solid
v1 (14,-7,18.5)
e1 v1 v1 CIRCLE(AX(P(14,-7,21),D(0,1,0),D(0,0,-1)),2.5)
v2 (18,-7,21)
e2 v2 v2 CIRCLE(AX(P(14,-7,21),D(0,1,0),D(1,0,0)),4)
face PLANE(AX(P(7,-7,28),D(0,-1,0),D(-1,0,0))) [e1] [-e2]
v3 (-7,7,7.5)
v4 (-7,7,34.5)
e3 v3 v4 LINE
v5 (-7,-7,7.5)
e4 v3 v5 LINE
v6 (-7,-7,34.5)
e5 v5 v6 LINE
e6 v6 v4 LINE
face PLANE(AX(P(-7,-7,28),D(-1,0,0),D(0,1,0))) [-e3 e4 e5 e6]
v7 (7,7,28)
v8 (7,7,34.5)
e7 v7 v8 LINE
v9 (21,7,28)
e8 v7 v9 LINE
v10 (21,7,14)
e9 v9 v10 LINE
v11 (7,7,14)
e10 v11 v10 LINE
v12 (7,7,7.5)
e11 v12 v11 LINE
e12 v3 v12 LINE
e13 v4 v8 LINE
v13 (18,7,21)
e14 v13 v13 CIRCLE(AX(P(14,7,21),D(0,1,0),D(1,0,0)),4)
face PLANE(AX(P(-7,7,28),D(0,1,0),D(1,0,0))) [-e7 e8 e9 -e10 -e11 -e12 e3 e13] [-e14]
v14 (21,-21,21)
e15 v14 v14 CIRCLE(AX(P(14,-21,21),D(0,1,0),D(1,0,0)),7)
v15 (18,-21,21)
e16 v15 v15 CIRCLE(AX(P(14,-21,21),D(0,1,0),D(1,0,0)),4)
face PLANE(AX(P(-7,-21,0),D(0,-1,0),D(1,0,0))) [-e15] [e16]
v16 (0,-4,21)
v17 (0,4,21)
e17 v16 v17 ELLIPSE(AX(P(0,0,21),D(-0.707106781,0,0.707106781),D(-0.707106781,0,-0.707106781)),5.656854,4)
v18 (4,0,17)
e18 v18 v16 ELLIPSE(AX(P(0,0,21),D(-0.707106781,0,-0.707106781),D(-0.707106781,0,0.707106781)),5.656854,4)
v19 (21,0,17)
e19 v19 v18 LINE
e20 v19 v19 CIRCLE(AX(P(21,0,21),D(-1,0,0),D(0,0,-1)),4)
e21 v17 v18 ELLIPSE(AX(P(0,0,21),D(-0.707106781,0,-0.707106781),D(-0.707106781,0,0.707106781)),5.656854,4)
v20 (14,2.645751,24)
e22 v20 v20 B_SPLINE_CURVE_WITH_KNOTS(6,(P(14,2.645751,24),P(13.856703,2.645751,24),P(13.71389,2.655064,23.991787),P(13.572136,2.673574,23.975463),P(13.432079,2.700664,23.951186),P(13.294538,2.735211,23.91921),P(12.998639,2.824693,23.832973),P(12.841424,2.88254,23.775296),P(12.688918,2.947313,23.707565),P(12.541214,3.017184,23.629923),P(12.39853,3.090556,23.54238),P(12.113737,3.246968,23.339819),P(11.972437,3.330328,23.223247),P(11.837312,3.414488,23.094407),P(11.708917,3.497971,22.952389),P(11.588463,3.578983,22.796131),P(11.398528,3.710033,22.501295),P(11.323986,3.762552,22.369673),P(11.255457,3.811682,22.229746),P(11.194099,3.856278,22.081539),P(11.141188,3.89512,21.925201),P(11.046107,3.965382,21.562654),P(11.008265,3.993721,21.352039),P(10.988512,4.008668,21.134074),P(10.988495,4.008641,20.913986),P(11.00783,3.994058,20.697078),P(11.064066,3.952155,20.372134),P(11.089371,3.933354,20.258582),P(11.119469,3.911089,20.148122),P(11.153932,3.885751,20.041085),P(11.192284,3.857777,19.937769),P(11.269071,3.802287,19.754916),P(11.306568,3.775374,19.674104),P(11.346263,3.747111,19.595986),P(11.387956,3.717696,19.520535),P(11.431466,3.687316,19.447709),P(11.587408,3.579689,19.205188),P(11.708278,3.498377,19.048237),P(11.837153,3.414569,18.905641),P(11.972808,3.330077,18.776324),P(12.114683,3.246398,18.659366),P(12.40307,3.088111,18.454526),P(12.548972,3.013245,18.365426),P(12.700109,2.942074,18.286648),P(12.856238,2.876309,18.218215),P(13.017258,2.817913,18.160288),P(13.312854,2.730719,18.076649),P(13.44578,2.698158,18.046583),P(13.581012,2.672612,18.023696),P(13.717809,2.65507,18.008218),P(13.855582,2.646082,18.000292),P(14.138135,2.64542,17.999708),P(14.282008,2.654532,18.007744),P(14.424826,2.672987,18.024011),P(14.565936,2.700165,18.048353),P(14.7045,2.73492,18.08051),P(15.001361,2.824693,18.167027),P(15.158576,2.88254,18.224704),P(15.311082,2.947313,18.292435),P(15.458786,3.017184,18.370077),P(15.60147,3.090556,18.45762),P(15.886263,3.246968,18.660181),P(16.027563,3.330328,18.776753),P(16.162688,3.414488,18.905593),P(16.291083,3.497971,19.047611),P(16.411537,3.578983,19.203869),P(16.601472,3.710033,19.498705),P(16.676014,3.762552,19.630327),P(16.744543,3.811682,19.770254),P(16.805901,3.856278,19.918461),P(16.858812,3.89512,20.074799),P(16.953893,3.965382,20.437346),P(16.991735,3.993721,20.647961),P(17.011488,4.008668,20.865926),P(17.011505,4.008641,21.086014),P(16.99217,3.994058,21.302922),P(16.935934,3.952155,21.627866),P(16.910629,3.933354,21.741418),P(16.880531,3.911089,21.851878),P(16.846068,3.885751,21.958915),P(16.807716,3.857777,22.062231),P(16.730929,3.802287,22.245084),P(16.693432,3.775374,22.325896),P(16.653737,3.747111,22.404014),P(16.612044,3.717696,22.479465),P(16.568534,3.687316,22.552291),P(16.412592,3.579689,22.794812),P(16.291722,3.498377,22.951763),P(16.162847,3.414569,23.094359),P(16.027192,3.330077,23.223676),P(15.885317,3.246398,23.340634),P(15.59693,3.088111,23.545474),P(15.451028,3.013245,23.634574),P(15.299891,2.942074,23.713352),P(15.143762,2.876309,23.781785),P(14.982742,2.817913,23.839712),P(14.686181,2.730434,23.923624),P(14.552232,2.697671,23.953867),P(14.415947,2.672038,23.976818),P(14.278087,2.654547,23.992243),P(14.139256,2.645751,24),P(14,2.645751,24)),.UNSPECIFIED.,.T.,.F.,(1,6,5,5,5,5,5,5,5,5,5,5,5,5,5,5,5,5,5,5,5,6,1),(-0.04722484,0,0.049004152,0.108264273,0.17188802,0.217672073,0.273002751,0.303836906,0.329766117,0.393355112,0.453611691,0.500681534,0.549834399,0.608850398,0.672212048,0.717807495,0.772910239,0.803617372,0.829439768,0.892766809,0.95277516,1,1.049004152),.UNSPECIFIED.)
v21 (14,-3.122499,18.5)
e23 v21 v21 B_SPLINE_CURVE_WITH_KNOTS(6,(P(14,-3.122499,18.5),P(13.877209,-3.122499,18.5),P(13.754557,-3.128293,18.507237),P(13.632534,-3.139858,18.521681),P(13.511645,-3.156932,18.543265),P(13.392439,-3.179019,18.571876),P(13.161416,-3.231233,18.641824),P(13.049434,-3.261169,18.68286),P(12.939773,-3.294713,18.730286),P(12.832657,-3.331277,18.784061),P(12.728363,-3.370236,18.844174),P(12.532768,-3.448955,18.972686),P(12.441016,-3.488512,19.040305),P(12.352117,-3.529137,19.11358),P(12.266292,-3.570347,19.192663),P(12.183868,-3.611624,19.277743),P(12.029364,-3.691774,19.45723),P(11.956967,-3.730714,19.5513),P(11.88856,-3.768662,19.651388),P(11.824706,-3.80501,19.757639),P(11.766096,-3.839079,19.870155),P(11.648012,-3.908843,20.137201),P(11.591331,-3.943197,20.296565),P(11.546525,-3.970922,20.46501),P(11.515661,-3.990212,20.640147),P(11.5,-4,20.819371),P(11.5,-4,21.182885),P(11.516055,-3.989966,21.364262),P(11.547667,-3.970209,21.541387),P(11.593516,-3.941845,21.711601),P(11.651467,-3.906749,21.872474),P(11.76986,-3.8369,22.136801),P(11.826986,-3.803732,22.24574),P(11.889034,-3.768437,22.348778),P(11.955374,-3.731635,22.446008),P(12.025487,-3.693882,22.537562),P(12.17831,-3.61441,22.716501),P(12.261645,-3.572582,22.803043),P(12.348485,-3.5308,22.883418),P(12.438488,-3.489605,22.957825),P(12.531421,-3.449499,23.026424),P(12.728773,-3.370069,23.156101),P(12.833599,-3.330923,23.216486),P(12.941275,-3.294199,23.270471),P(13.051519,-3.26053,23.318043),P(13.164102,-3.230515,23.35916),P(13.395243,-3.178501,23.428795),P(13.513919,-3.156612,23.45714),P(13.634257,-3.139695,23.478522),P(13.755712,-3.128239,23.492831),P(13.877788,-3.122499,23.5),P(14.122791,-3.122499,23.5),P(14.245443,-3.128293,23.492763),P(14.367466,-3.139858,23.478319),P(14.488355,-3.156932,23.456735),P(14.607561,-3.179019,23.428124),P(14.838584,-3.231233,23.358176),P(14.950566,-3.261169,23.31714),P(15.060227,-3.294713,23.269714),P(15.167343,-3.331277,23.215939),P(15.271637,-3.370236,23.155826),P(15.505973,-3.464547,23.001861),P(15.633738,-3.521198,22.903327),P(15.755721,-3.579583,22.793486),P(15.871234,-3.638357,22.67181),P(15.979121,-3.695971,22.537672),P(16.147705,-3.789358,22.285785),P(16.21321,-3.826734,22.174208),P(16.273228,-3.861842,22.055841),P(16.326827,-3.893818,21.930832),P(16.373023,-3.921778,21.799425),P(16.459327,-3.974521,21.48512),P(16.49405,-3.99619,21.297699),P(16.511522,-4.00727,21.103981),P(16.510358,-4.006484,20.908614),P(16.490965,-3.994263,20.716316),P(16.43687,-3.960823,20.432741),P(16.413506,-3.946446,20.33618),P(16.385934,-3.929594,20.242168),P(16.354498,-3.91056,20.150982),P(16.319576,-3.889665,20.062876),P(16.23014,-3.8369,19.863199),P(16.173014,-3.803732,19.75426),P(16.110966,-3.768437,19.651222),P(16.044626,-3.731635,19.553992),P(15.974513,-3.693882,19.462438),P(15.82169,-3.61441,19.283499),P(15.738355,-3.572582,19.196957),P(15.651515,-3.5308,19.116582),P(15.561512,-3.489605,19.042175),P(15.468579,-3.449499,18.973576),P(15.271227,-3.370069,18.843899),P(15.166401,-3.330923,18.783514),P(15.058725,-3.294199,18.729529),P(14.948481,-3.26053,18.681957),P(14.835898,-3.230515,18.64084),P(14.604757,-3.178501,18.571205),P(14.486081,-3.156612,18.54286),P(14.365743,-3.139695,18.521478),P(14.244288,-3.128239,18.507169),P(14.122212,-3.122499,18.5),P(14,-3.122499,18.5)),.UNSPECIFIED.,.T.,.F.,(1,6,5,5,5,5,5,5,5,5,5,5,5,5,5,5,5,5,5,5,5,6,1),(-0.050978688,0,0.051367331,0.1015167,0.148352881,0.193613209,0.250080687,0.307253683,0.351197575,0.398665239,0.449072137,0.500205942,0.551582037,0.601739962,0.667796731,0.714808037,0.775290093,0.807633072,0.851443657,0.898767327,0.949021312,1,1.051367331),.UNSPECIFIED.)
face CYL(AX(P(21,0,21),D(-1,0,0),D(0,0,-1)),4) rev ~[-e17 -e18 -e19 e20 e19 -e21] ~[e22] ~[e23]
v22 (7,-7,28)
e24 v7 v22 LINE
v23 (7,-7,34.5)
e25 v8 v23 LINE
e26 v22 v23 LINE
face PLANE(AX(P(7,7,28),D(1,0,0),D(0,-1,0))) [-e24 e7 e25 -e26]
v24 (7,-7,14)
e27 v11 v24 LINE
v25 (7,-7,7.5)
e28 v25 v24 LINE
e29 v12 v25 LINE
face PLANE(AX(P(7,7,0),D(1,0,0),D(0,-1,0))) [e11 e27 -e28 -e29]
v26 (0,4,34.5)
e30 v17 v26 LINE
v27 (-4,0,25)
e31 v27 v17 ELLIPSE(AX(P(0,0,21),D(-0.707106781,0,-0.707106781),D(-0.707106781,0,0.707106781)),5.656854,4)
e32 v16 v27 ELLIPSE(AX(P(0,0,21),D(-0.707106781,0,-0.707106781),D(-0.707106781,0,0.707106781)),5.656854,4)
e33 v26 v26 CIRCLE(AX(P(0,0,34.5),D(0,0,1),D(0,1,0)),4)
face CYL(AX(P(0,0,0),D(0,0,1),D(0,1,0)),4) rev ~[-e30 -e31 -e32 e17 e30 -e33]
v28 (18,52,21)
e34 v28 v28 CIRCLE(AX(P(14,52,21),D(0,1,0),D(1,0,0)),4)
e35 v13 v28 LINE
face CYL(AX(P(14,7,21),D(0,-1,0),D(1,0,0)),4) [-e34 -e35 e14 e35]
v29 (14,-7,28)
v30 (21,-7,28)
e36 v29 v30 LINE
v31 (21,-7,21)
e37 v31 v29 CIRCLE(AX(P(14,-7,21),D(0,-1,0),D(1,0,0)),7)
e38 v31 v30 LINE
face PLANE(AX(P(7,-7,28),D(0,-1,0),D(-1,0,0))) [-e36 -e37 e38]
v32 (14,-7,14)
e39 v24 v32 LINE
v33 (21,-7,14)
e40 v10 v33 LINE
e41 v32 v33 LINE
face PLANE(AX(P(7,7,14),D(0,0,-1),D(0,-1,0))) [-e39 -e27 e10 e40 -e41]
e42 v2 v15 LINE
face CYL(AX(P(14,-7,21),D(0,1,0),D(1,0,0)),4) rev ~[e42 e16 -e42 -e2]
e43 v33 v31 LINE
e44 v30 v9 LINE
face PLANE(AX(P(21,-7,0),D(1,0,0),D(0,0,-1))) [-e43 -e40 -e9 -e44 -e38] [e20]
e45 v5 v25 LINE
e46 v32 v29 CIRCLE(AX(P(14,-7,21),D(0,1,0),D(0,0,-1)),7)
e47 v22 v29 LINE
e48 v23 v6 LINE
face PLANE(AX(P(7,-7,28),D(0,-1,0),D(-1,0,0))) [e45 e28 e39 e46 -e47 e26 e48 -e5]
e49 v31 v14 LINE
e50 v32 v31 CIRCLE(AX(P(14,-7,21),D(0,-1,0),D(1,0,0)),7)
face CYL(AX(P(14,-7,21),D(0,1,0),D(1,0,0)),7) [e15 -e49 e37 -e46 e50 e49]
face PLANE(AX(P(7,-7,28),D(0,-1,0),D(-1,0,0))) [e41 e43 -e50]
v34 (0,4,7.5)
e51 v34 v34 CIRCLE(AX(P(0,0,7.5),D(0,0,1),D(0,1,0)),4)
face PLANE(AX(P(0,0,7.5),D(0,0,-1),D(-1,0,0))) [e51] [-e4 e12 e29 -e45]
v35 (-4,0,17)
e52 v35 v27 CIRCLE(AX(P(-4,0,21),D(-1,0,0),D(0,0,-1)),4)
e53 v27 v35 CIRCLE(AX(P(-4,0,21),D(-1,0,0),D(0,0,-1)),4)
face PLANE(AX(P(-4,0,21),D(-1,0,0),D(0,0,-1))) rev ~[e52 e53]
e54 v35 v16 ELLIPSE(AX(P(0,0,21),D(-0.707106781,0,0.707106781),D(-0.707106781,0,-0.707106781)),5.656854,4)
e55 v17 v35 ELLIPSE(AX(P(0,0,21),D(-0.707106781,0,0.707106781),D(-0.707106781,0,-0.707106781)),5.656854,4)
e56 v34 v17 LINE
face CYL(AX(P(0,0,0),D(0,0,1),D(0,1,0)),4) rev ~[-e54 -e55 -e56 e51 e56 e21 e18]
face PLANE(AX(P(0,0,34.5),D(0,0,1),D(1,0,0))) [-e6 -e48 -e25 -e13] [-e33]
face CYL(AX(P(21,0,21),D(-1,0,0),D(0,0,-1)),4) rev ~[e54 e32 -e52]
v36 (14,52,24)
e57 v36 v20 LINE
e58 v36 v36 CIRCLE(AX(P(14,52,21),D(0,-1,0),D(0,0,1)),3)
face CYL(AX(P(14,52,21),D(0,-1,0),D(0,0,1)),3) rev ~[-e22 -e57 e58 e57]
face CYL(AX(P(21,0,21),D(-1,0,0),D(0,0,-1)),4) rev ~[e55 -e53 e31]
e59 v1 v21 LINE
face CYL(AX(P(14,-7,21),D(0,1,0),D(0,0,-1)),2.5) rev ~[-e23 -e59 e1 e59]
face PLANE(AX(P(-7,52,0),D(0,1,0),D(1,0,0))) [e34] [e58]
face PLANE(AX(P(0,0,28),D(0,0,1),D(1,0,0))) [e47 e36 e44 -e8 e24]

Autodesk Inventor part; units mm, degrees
ref_plane "YZ Plane" through (0, 0, 0) normal (1, 0, 0) x (0, 1, 0)
ref_plane "XZ Plane" through (0, 0, 0) normal (0, 1, 0) x (-1, 0, 0)
ref_plane "XY Plane" through (0, 0, 0) normal (0, 0, 1) x (1, 0, 0)
sketch "Sketch1" plane through (0, 0, 0) normal (0, 0, 1) x (1, 0, 0)
  line L0 (-7, 7) -> (7, 7)
  line L1 (7, 7) -> (7, -7)
  line L2 (7, -7) -> (-7, -7)
  line L3 (-7, -7) -> (-7, 7)
  line L4 (-7, 7) -> (7, -7) construction
  line L5 (7, 7) -> (-7, -7) construction
  point P0 (0, 0)
  dimension "d0" = 14
  dimension "d1" = 14
extrude "Extrusion1" add sketch "Sketch1" along normal blind 28
sketch "Sketch2" plane through (7, -7, 0) normal (1, 0, 0) x (0, 0, -1)
  line L0 (-28, 0) -> (-28, 14) projected
  line L1 (-28, 14) -> (-14, 14)
  line L2 (-14, 14) -> (-14, 0)
  line L3 (-14, 0) -> (-28, 0)
  line L4 (-28, 0) -> (-28, 14)
  point P0 (0, 7)
  dimension "d4" = 14
  dimension "d5" = 14
extrude "Extrusion2" add sketch "Sketch2" along normal blind 14
sketch "Sketch3" plane through (21, -7, 0) normal (1, 0, 0) x (0, 0, -1)
  line L0 (-14, 0) -> (-14, 14) projected
  line L1 (-14, 14) -> (-28, 14) projected
  line L2 (-28, 14) -> (-28, 0) projected
  line L3 (-28, 0) -> (-14, 0) projected
  line L4 (-28, 14) -> (-14, 14)
  line L5 (-14, 14) -> (-14, 0)
  line L6 (-14, 0) -> (-28, 0)
  line L7 (-28, 0) -> (-28, 14)
  point P0 (0, 7)
  point P1 (-21, 7)
hole "Hole1" at (21, 0, 21) direction (-1, 0, 0) diameter 8 depth 25
sketch "Sketch4" plane through (0, 0, 0) normal (0, 0, -1) x (-1, 0, 0)
  line L0 (7, -7) -> (-7, -7) projected
  line L1 (7, 7) -> (7, -7) projected
  line L2 (-7, 7) -> (7, 7) projected
  line L3 (-7, -7) -> (-7, 7) projected
  point P0 (0, 0)
  point P1 (0, 0)
sketch "Sketch5" plane through (-7, 7, 0) normal (0, 1, 0) x (1, 0, 0)
  line L0 (14, 0) -> (0, 0) projected
  line L1 (0, 0) -> (0, -28) projected
  line L2 (0, -28) -> (28, -28) projected
  line L3 (28, -14) -> (28, -28) projected
  line L4 (14, -14) -> (28, -14) projected
  line L5 (14, 0) -> (14, -14) projected
  line L6 (14, -14) -> (28, -14)
  line L7 (28, -14) -> (28, -28)
  line L8 (28, -28) -> (14, -28)
  line L9 (14, -28) -> (14, -14)
  circle A0 centre (21, -21) radius 4
  point P0 (7, 0)
  dimension "d23" = 8
extrude "Extrusion3" add sketch "Sketch5" along normal blind 45 contours A0
thread "Thread1" size "M8x1.25" class "6g" standard "ANSI Metric M Profile" length 45 offset 36
sketch "Sketch6" plane through (14, 52, 21) normal (0, 1, 0) x (1, 0, 0)
  circle A0 centre (0, 0) radius 4 projected
  point P0 (-14, 21)
hole "Hole3" at (14, 52, 21) direction (0, -1, 0) diameter 6 depth 50 tip angle 118
sketch "Sketch7" plane through (-7, -7, 0) normal (0, -1, 0) x (1, 0, 0)
  line L0 (28, 28) -> (28, 14) projected
  line L1 (14, 14) -> (28, 14) projected
  line L2 (28, 28) -> (14, 28)
  line L3 (14, 28) -> (14, 14)
  line L4 (14, 14) -> (28, 14)
  line L5 (28, 14) -> (28, 28)
  circle A0 centre (21, 21) radius 3 projected
  circle A1 centre (21, 21) radius 7
  circle A2 centre (21, 21) radius 4 projected
  circle A3 centre (21, 21) radius 4
  line L6 (21, 21) -> (0, 21)
  line L7 (0, 0) -> (0, 28) projected
  line L8 (0, 21) -> (0, 34.5)
  line L9 (0, 34.5) -> (0, 21)
  line L10 (0, 21) -> (0, 7.5)
  point P0 (7, 0)
  dimension "d35" = 14
  dimension "d36" = 8
  dimension "d37" = 13.5
  dimension "d38" = 13.5
sketch "Sketch8" plane through (0, 0, 0) normal (0, 0, -1) x (-1, 0, 0)
  line L0 (7, -7) -> (-7, -7) projected
  line L1 (7, 7) -> (7, -7) projected
  line L2 (-7, -7) -> (7, -7)
  line L3 (7, -7) -> (7, 7)
  line L4 (7, 7) -> (-7, 7)
  line L5 (-7, 7) -> (-7, -7)
  point P0 (0, 0)
extrude "Extrusion4" cut sketch "Sketch8" against normal blind 7.5
sketch "Sketch9" plane through (0, 0, 28) normal (0, 0, 1) x (1, 0, 0)
  line L0 (-7, 7) -> (21, 7) projected
  line L1 (-7, 7) -> (7, 7)
  line L2 (7, 7) -> (7, -7)
  line L3 (7, -7) -> (-7, -7)
  line L4 (-7, -7) -> (-7, 7)
  point P0 (0, 0)
  dimension "d41" = 14
  dimension "d42" = 14
extrude "Extrusion5" add sketch "Sketch9" along normal blind 6.5
hole "Hole4" at (0, 0, 0) direction (0, 0, 1) diameter 8 end through all
extrude "Extrusion6" add sketch "Sketch7" along normal blind 14 contours A1
thread "Thread2" size "M8x1" class "6H" standard "ANSI Metric M Profile" length 45
sketch "Sketch10" plane through (14, -7, 21) normal (0, -1, 0) x (1, 0, 0)
  circle A0 centre (0, 0) radius 4 projected
  point P0 (-14, -21)
hole "Hole5" at (14, -7, 21) direction (0, 1, 0) diameter 5 depth 8
properties part number "HUDSON-1-45"
